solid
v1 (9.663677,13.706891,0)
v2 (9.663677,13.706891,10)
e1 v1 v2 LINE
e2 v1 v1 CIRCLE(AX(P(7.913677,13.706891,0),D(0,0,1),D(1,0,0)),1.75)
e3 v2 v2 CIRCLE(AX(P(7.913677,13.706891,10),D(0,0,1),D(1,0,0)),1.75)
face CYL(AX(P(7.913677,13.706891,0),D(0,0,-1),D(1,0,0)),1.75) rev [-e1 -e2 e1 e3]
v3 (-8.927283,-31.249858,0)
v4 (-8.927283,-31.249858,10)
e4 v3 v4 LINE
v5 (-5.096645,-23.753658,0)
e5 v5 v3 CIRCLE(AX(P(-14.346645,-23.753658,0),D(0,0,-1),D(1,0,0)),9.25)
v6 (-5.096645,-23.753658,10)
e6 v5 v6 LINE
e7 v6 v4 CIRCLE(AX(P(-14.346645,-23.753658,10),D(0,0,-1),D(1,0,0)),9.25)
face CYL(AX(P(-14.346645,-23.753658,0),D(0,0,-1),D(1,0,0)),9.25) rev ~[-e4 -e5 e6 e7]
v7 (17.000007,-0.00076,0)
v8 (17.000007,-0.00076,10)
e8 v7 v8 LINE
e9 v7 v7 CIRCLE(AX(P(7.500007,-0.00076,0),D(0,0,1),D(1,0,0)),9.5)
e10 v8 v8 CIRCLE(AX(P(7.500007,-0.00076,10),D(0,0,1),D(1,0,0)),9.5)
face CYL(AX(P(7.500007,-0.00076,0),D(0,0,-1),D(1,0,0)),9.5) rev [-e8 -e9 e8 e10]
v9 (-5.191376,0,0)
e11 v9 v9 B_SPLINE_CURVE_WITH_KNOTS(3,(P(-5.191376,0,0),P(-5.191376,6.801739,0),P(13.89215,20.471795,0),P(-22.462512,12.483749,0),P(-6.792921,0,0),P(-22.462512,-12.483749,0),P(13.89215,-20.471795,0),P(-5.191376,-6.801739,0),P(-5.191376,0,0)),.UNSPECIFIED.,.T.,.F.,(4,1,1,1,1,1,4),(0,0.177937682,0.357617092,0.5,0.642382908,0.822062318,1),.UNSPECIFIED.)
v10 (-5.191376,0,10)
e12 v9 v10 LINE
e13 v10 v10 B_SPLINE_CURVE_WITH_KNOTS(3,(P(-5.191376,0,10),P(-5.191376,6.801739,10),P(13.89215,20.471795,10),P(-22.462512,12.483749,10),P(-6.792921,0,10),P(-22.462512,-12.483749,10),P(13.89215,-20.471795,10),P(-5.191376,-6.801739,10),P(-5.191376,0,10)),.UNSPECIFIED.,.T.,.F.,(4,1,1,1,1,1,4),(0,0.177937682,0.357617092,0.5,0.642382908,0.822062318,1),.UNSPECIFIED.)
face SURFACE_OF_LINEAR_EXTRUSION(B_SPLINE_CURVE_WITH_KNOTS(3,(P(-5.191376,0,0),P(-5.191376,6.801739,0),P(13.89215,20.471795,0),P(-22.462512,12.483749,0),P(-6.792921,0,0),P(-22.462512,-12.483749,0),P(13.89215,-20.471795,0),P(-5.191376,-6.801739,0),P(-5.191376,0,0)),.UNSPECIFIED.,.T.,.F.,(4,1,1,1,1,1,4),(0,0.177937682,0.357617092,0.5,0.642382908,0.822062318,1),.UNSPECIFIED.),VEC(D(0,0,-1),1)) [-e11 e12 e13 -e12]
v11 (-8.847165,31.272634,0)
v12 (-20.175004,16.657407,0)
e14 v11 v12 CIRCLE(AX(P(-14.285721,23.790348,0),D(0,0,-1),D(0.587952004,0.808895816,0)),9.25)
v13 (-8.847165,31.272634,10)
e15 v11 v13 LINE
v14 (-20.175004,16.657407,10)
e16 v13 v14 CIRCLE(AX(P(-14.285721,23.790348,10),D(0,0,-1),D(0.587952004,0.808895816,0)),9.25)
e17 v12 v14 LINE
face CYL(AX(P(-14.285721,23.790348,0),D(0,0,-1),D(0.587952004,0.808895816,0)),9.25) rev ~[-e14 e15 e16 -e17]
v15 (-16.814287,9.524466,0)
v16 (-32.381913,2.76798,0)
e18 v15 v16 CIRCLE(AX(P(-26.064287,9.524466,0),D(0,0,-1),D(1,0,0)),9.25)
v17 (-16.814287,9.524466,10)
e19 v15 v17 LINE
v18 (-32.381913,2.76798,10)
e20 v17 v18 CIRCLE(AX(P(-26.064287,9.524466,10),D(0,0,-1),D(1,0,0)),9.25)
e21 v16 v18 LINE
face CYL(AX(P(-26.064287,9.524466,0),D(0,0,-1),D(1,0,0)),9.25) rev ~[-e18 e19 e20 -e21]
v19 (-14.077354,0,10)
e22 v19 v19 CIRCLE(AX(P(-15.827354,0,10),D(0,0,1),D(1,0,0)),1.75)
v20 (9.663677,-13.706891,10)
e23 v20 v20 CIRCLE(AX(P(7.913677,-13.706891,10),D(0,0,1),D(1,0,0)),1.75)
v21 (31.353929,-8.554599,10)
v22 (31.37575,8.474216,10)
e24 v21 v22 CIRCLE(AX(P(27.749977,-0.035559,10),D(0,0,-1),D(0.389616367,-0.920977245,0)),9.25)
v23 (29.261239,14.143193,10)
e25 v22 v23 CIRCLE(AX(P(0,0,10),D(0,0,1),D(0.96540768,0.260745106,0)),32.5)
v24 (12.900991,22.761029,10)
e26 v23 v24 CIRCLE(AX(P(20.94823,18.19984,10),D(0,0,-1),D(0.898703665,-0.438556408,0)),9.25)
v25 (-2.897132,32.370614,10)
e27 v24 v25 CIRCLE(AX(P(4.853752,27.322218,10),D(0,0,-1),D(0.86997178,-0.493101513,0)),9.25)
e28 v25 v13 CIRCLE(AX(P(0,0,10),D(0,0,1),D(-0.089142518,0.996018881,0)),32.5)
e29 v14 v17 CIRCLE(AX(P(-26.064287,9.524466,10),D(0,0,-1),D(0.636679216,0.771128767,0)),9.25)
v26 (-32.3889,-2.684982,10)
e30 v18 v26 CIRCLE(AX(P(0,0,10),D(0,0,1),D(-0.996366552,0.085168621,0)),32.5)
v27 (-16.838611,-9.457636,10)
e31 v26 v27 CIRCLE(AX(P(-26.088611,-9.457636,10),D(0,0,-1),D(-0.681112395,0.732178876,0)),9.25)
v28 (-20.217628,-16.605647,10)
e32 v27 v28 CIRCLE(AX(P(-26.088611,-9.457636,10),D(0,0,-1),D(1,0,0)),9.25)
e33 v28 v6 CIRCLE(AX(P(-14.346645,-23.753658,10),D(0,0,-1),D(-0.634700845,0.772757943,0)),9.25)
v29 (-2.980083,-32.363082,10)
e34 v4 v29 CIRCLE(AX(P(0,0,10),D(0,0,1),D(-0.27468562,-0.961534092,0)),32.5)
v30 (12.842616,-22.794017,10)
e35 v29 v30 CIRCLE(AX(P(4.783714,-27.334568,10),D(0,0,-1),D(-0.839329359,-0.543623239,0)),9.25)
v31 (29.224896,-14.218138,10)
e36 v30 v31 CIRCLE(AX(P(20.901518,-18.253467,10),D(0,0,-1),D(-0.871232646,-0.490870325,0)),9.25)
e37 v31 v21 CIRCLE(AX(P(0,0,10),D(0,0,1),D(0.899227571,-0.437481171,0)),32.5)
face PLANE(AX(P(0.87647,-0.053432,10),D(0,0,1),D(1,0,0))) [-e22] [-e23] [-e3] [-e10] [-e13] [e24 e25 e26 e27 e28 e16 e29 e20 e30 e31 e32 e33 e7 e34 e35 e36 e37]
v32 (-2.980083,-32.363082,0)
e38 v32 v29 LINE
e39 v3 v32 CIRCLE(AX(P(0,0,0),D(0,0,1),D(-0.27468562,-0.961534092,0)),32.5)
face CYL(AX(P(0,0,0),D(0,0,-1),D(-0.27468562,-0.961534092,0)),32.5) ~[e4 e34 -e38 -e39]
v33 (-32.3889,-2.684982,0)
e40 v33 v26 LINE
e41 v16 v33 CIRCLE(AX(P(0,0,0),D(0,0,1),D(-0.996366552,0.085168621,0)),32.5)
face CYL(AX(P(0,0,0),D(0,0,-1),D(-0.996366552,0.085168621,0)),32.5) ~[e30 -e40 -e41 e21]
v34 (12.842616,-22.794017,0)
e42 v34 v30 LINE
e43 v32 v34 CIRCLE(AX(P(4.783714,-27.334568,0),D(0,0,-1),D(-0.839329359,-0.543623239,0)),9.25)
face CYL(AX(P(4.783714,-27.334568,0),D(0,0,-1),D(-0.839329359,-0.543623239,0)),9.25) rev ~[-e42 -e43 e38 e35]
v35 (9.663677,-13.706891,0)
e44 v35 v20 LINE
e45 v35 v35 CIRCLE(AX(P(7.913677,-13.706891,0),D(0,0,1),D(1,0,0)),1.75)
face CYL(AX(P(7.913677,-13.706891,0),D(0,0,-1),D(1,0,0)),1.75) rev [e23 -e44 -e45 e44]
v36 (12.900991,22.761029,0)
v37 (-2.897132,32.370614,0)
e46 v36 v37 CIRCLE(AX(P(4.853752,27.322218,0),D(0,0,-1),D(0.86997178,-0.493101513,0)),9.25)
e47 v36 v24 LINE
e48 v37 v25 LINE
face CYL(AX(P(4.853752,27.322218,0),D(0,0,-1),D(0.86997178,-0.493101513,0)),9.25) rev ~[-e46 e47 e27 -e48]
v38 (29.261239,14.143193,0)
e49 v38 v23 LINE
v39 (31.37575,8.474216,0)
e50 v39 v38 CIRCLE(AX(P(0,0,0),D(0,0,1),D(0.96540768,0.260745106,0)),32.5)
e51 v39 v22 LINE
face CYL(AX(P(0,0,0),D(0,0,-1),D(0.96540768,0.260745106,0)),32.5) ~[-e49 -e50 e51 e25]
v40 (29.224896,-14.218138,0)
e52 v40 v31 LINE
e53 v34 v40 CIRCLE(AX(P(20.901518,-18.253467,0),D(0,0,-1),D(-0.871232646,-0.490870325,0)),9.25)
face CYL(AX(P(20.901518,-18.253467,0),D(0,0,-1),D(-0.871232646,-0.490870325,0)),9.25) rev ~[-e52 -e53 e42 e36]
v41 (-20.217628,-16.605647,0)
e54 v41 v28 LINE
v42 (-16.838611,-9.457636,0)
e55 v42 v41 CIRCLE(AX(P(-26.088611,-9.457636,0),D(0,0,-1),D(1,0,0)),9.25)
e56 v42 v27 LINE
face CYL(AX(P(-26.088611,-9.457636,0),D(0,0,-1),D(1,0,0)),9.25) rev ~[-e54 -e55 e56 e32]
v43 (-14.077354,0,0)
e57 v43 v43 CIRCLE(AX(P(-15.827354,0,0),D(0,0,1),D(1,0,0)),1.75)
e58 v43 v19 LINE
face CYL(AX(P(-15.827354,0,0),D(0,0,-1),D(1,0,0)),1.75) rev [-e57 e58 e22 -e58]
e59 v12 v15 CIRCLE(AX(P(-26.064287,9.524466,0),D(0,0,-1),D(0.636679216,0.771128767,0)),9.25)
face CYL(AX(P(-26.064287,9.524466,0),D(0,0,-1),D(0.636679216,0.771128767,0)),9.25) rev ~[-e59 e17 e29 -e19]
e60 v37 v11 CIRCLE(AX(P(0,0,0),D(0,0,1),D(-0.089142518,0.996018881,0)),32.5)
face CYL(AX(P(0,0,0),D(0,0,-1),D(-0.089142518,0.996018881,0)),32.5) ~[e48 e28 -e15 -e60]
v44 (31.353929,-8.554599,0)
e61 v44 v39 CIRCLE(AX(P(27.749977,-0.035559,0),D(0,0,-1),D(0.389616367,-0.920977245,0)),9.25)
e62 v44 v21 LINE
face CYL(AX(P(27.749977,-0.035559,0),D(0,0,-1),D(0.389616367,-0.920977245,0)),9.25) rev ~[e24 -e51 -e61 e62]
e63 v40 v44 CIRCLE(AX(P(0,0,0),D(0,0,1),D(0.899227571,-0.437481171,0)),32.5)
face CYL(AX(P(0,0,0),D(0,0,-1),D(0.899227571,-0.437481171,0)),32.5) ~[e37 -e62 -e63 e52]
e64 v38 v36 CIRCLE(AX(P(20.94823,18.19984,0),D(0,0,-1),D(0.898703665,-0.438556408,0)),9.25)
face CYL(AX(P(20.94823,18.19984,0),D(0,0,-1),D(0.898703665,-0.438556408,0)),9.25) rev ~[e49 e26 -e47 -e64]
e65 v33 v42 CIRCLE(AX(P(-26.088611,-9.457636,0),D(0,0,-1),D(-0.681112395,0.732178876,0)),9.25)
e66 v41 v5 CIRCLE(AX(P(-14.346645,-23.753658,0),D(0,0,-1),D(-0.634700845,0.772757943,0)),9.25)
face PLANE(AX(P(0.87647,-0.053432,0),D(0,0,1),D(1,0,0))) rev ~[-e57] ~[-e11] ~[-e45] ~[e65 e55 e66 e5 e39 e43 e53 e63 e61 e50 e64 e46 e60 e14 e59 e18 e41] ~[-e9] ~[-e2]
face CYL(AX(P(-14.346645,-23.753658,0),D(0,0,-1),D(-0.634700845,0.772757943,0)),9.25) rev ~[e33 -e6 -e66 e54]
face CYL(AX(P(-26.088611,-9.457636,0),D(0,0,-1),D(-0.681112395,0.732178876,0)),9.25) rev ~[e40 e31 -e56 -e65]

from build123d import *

# Parameters (mm, degrees)
F0_R     = 1.75
F0_R_2   = 9.5
F1_DEPTH = 10


with BuildPart() as f1:
    # F0 (on Top) → F1 (new body)
    with BuildSketch(Plane.XY):
        with BuildLine():
            ThreePointArc((31.353928612, -8.5545987979), (18.4999848113, -0.0237061853), (31.3757496158, 8.4742159547))
            ThreePointArc((31.3757496158, 8.4742159547), (30.4507046637, 11.3580185545), (29.2612387482, 14.1431929536))
            ThreePointArc((29.2612387482, 14.1431929536), (16.6372633011, 10.0158268124), (12.9009909928, 22.7610289132))
            ThreePointArc((12.9009909928, 22.7610289132), (0.046675345, 19.4194010798), (-2.8971318292, 32.3706136359))
            ThreePointArc((-2.8971318292, 32.3706136359), (-5.8977553578, 31.9603892614), (-8.8471652882, 31.2726344647))
            ThreePointArc((-8.8471652882, 31.2726344647), (-6.0434782071, 27.9889108187), (-5.0357213297, 23.7903481709))
            ThreePointArc((-5.0357213297, 23.7903481709), (-10.3432199295, 15.4226015979), (-20.1750040777, 16.6574070724))
            ThreePointArc((-20.1750040777, 16.6574070724), (-17.6965402546, 13.4669673747), (-16.8142868283, 9.5244659761))
            ThreePointArc((-16.8142868283, 9.5244659761), (-22.3815936251, 1.0391686466), (-32.381912941, 2.7679801809))
            ThreePointArc((-32.381912941, 2.7679801809), (-32.4999733171, 0.0416460012), (-32.3889004563, -2.6849817936))
            ThreePointArc((-32.3889004563, -2.6849817936), (-22.3950474365, -0.9770650907), (-16.838610807, -9.4576363939))
            ThreePointArc((-16.838610807, -9.4576363939), (-17.7259230613, -13.410857064), (-20.2176278161, -16.6056472165))
            ThreePointArc((-20.2176278161, -16.6056472165), (-10.3934242287, -15.3909704883), (-5.0966450027, -23.7536581849))
            ThreePointArc((-5.0966450027, -23.7536581849), (-6.10978875, -27.9627791232), (-8.92728264, -31.2498579943))
            ThreePointArc((-8.92728264, -31.2498579943), (-5.9796449934, -31.9451693649), (-2.9800826539, -32.3630824764))
            ThreePointArc((-2.9800826539, -32.3630824764), (-0.0030934102, -19.4194569281), (12.8426160032, -22.7940171899))
            ThreePointArc((12.8426160032, -22.7940171899), (16.6115398174, -10.0584323751), (29.2248960714, -14.2181380503))
            ThreePointArc((29.2248960714, -14.2181380503), (30.4214960056, -11.4360211953), (31.353928612, -8.5545987979))
        make_face()
        with Locations((7.9136770219, -13.7068906766)):
            Circle(F0_R, mode=Mode.SUBTRACT)
        with Locations((-15.8273540437, 0)):
            Circle(F0_R, mode=Mode.SUBTRACT)
        with BuildLine():
            add(Edge.make_bspline(
                [(-5.1913755015, 0), (-5.1913755015, 6.8017390599), (13.8921502508, 20.4717954372), (-22.4625123754, 12.4837485834), (-6.7929208138, 0), (-22.4625123754, -12.4837485834), (13.8921502508, -20.4717954372), (-5.1913755015, -6.8017390599), (-5.1913755015, 0)],
                knots=[0, 0, 0, 0, 0.177937682, 0.3576170923, 0.5, 0.6423829077, 0.822062318, 1, 1, 1, 1], degree=3))
        make_face(mode=Mode.SUBTRACT)
        with Locations((7.5000071177, -0.0007600863)):
            Circle(F0_R_2, mode=Mode.SUBTRACT)
        with Locations((7.9136770219, 13.7068906766)):
            Circle(F0_R, mode=Mode.SUBTRACT)
    extrude(amount=F1_DEPTH)


solid = f1.part
